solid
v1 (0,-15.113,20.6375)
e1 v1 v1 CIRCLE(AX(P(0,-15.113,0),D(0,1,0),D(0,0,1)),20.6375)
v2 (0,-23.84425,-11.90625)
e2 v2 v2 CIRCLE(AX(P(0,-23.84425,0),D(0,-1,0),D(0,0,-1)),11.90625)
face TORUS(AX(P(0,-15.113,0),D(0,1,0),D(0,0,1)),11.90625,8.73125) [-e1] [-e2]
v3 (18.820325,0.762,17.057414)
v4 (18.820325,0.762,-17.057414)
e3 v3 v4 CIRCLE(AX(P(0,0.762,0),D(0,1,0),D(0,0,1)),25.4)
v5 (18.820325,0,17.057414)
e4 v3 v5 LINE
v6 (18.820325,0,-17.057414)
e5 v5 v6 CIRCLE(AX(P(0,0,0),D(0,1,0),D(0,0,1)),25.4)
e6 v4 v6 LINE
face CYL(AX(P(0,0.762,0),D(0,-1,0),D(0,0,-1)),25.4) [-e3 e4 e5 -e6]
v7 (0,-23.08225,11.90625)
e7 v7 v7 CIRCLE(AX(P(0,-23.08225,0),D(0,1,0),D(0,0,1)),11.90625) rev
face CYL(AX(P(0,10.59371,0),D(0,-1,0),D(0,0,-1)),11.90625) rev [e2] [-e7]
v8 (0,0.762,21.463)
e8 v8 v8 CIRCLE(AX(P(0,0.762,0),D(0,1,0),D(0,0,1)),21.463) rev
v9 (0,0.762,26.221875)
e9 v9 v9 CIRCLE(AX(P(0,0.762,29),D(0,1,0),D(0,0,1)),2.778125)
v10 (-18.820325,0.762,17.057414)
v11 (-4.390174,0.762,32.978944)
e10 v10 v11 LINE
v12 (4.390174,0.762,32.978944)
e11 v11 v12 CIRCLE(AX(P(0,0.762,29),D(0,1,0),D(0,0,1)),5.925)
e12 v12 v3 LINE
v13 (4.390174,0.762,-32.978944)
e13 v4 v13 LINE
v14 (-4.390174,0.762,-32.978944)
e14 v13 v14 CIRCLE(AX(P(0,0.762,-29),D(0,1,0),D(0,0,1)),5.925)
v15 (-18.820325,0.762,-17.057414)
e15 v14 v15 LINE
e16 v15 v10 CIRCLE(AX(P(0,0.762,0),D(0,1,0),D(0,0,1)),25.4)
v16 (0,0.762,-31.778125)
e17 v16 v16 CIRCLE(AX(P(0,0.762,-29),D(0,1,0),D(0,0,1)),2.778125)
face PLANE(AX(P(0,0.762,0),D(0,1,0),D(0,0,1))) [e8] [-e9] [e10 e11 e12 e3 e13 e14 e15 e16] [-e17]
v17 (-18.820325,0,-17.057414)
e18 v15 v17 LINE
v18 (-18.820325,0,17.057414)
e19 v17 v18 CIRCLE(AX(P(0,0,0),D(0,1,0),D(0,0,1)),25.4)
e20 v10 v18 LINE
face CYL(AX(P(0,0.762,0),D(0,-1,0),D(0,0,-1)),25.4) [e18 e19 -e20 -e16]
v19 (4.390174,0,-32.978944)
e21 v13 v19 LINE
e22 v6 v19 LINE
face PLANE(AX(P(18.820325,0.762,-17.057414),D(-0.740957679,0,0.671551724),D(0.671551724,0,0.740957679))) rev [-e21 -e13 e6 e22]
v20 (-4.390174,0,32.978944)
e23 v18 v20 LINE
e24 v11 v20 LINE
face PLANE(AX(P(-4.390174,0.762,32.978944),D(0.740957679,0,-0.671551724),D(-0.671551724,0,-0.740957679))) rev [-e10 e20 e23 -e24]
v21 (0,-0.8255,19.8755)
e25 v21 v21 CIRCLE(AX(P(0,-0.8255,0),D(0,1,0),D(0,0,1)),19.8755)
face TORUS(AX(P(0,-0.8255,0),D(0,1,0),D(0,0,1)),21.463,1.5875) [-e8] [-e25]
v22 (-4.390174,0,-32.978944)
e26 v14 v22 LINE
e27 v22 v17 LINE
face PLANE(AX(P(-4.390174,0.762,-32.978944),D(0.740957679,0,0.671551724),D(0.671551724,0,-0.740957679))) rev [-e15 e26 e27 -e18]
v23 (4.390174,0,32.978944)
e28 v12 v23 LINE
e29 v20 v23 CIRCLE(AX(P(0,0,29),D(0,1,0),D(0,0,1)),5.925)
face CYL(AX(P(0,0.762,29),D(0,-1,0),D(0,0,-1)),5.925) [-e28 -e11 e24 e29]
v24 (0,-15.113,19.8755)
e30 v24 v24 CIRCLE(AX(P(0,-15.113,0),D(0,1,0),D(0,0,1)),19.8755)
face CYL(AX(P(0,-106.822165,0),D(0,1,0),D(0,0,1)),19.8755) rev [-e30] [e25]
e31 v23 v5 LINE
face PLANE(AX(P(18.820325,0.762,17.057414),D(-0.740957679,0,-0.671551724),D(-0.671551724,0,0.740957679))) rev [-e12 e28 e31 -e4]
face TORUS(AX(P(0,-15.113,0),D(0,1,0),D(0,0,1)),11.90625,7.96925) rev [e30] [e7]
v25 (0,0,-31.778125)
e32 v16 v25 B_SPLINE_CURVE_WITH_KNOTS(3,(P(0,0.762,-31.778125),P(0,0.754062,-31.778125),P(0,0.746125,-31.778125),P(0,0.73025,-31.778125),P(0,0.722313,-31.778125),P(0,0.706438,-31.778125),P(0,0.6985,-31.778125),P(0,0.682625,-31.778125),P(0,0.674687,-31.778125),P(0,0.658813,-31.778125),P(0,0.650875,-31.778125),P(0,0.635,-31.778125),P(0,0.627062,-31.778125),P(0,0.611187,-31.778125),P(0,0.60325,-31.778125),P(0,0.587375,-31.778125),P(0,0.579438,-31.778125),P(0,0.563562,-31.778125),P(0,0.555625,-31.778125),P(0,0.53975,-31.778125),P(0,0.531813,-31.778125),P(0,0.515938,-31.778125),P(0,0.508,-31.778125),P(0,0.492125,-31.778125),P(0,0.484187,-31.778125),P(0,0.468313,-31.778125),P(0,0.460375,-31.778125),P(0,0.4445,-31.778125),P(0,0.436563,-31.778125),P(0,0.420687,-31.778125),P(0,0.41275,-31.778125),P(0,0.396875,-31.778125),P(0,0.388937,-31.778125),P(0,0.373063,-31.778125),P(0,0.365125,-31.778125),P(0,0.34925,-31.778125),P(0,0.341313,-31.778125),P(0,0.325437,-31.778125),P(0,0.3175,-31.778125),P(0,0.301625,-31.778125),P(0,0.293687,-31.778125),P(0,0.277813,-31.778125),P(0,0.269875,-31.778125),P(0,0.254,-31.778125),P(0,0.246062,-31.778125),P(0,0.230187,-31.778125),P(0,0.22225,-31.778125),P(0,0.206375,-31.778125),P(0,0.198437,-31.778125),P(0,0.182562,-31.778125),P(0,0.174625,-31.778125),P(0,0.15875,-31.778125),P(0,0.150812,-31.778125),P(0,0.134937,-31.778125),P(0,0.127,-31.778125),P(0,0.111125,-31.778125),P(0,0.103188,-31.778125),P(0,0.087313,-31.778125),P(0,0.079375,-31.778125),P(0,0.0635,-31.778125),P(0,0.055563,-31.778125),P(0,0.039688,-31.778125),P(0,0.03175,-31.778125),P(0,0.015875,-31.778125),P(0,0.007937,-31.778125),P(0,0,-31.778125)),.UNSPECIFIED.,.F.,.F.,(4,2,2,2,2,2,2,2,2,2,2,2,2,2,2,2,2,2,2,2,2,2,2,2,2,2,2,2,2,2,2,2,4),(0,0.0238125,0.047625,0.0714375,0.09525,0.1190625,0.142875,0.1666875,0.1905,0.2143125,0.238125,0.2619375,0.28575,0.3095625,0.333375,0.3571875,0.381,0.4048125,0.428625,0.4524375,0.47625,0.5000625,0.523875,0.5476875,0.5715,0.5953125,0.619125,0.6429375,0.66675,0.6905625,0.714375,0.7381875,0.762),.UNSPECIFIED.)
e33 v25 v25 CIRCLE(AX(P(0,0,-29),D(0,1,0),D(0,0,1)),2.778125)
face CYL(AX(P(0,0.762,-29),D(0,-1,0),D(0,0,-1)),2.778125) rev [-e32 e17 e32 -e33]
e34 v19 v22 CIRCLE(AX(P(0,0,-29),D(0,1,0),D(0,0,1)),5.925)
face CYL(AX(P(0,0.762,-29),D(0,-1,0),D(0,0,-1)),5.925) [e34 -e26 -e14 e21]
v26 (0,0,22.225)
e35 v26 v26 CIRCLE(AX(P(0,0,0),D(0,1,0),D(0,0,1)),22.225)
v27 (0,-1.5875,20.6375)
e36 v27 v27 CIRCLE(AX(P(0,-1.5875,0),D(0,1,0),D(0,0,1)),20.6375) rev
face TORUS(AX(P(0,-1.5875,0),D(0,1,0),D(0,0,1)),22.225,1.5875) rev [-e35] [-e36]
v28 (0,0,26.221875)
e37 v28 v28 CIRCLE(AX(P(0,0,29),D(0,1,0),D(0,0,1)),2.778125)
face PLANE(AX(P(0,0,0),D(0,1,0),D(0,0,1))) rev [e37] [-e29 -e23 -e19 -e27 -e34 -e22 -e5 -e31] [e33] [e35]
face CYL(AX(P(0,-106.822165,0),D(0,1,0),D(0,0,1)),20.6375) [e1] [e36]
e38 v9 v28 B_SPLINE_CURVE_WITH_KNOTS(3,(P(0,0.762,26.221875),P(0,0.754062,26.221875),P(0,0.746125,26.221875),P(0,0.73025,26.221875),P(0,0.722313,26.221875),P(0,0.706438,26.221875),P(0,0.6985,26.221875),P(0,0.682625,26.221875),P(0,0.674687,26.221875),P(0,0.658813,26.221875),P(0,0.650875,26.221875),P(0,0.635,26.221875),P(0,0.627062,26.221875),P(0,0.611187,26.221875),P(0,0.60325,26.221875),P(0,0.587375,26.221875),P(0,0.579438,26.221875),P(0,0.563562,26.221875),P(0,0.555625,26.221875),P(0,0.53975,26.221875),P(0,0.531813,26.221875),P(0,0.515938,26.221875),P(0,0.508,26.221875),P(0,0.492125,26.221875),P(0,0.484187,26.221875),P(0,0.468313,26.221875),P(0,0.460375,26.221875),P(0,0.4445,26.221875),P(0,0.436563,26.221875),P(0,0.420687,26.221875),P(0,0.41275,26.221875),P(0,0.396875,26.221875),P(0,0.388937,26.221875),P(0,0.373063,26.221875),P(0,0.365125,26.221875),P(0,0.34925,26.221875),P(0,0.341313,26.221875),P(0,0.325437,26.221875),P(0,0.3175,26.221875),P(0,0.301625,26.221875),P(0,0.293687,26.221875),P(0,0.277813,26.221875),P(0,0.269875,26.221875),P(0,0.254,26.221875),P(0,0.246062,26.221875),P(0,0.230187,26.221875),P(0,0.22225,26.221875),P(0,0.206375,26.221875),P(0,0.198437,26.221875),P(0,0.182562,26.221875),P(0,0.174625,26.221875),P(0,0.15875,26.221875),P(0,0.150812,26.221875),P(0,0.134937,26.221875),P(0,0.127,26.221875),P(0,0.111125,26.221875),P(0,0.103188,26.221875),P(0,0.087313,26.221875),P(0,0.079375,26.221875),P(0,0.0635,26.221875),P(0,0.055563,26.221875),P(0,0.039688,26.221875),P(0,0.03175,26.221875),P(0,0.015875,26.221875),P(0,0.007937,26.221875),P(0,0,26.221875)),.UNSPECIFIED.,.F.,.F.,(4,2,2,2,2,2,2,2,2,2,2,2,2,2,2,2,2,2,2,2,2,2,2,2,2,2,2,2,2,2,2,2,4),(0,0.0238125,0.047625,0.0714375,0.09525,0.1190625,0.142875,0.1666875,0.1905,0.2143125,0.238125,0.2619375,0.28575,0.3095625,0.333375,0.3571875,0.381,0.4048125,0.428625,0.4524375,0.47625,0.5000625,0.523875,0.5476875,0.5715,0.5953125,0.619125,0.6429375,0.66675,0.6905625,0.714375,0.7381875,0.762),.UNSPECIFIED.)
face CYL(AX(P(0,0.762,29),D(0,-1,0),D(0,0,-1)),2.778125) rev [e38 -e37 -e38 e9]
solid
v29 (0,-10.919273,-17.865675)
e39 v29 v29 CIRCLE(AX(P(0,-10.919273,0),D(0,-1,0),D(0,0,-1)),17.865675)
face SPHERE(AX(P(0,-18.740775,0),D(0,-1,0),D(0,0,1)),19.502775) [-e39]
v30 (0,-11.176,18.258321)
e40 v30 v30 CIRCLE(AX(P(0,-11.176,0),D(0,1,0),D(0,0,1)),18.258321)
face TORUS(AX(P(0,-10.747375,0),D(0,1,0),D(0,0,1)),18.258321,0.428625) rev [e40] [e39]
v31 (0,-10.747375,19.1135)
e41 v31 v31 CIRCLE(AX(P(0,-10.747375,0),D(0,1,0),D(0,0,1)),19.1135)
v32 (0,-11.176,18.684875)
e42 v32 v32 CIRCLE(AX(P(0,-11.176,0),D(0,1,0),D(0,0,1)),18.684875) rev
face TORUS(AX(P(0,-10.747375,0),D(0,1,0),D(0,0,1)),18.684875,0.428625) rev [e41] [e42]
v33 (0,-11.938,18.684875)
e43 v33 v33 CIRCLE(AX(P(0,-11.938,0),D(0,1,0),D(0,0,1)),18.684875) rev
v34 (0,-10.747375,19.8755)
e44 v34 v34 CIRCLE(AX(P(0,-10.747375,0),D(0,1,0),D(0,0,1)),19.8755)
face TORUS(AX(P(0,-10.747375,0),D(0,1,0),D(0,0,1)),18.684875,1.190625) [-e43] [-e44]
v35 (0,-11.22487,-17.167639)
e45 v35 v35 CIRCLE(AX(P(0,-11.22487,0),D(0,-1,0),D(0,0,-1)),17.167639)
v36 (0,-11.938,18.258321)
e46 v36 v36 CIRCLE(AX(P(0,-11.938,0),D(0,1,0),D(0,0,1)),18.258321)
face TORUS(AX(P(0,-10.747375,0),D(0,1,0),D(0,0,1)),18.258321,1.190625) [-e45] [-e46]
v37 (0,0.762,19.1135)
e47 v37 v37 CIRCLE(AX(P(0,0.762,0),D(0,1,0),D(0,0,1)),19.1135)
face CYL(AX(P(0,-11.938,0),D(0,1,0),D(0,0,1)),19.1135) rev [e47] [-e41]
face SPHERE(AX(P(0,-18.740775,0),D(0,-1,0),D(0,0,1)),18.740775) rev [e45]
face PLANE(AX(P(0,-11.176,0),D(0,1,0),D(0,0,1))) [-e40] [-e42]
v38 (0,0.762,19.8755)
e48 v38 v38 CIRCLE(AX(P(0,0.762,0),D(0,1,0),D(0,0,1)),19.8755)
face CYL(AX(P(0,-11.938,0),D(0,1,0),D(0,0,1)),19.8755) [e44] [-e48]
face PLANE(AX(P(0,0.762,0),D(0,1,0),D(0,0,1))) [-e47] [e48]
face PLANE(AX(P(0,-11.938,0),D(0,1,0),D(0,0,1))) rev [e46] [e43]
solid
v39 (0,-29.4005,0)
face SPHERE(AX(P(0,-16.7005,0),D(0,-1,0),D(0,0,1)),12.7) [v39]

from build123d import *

# Parameters (mm, degrees)
SKETCH1_R           = 2.778125
BOSS_EXTRUDE1_DEPTH = 0.762
SKETCH2_R           = 20.6375
BOSS_EXTRUDE2_DEPTH = 23.84425
FILLET1_R           = 8.73125
FILLET2_R           = 1.5875
SKETCH6_R           = 11.90625
CUT_EXTRUDE3_DEPTH  = 0.762
SKETCH7_R           = 19.8755
BOSS_EXTRUDE3_DEPTH = 12.7
FILLET3_R           = 1.190625
SHELL2_T            = -0.762


# Read off the part's stored shape, not the designer's step: Shell1
with BuildPart() as part:
    # Sketch1 → Boss-Extrude1 (new body)
    with BuildSketch(Plane(origin=(0, 0, 0), x_dir=(1, 0, 0), z_dir=(0, 1, 0))):
        with BuildLine():
            Line((18.820325042, -17.057413793), (4.390174247, -32.978943966))
            ThreePointArc((4.390174247, -32.978943966), (0, -34.925), (-4.390174247, -32.978943966))
            Line((-4.390174247, -32.978943966), (-18.820325042, -17.057413793))
            ThreePointArc((-18.820325042, -17.057413793), (-25.4, 0), (-18.820325042, 17.057413793))
            Line((-18.820325042, 17.057413793), (-4.390174247, 32.978943966))
            ThreePointArc((-4.390174247, 32.978943966), (0, 34.925), (4.390174247, 32.978943966))
            Line((4.390174247, 32.978943966), (18.820325042, 17.057413793))
            ThreePointArc((18.820325042, 17.057413793), (25.4, 0), (18.820325042, -17.057413793))
        make_face()
        with Locations(Location((0, 29, 0), (0, 0, 90))):
            Circle(SKETCH1_R, mode=Mode.SUBTRACT)
        with Locations(Location((0, -29, 0), (0, 0, 90))):
            Circle(SKETCH1_R, mode=Mode.SUBTRACT)
    extrude(amount=BOSS_EXTRUDE1_DEPTH)

    # Sketch2 → Boss-Extrude2 (add)
    with BuildSketch(Plane.XZ):
        with Locations(Location((0, 0, 0), (0, 0, 90))):
            Circle(SKETCH2_R)
    extrude(amount=BOSS_EXTRUDE2_DEPTH)

    # Fillet1
    fillet1_edges = [part.edges().sort_by_distance(p)[0] for p in [
        (0, -23.84425, -20.6375),
    ]]
    fillet(fillet1_edges, radius=FILLET1_R)

    # Shell1 outline → Shell1 (revolve, cut)
    with BuildSketch(Plane.XY):
        with BuildLine():
            ThreePointArc((11.90625, -23.08225), (17.541360716, -20.748110716), (19.8755, -15.113))
            Line((19.8755, -15.113), (19.8755, 0.762))
            Line((19.8755, 0.762), (0, 0.762))
            Line((0, 0.762), (0, -23.08225))
            Line((0, -23.08225), (11.90625, -23.08225))
        make_face()
    revolve(axis=Axis((0, 0, 0), (0, 1, 0)), mode=Mode.SUBTRACT)

    # Fillet2
    fillet2_edges = [part.edges().sort_by_distance(p)[0] for p in [
        (0, 0, -20.6375),
        (-19.8755, 0.762, 0),
    ]]
    fillet(fillet2_edges, radius=FILLET2_R)

    # Sketch6 → Cut-Extrude3 (cut)
    with BuildSketch(Plane.XZ.offset(23.84425)):
        with Locations(Location((0, 0, 0), (0, 0, 90))):
            Circle(SKETCH6_R)
    extrude(amount=-CUT_EXTRUDE3_DEPTH, mode=Mode.SUBTRACT)


with BuildPart() as body_2:
    # Sketch7 → Boss-Extrude3 (new body)
    with BuildSketch(Plane(origin=(0, 0.762, 0), x_dir=(1, 0, 0), z_dir=(0, 1, 0))):
        with Locations(Location((0, 0, 0), (0, 0, 270))):
            Circle(SKETCH7_R)
    extrude(amount=-BOSS_EXTRUDE3_DEPTH)

    # Sketch8 → Cut-Revolve1 (revolve, cut)
    with BuildSketch(Plane(origin=(0, 0, 0), x_dir=(0, 0, -1), z_dir=(1, 0, 0))):
        with BuildLine():
            Line((0, 0), (0, -11.938))
            Line((0, -11.938), (-17.4625, -11.938))
            ThreePointArc((-17.4625, -11.938), (-10.576563126, -3.269738778), (0, 0))
        make_face()
    revolve(axis=Axis((0, -30.908625, 0), (0, 1, 0)), mode=Mode.SUBTRACT)

    # Fillet3
    fillet3_edges = [body_2.edges().sort_by_distance(p)[0] for p in [
        (0, -11.938, -19.8755),
        (0, -11.938, -17.4625),
    ]]
    fillet(fillet3_edges, radius=FILLET3_R)

    # Shell2
    shell2_openings = [body_2.faces().sort_by_distance(p)[0] for p in [
        (0, 0.762, 0),
    ]]
    offset(amount=SHELL2_T, openings=shell2_openings, kind=Kind.INTERSECTION)


with BuildPart() as body_3:
    # Sketch3 → Revolve1 (revolve)
    with BuildSketch(Plane(origin=(0, 0, 0), x_dir=(0, 0, -1), z_dir=(1, 0, 0))):
        with BuildLine():
            Line((0, -29.4005), (0, -4.0005))
            ThreePointArc((0, -4.0005), (-12.7, -16.7005), (0, -29.4005))
        make_face()
    revolve(axis=Axis((0, -106.822164787, 0), (0, 1, 0)))


solid = Compound([part.part, body_2.part, body_3.part])
